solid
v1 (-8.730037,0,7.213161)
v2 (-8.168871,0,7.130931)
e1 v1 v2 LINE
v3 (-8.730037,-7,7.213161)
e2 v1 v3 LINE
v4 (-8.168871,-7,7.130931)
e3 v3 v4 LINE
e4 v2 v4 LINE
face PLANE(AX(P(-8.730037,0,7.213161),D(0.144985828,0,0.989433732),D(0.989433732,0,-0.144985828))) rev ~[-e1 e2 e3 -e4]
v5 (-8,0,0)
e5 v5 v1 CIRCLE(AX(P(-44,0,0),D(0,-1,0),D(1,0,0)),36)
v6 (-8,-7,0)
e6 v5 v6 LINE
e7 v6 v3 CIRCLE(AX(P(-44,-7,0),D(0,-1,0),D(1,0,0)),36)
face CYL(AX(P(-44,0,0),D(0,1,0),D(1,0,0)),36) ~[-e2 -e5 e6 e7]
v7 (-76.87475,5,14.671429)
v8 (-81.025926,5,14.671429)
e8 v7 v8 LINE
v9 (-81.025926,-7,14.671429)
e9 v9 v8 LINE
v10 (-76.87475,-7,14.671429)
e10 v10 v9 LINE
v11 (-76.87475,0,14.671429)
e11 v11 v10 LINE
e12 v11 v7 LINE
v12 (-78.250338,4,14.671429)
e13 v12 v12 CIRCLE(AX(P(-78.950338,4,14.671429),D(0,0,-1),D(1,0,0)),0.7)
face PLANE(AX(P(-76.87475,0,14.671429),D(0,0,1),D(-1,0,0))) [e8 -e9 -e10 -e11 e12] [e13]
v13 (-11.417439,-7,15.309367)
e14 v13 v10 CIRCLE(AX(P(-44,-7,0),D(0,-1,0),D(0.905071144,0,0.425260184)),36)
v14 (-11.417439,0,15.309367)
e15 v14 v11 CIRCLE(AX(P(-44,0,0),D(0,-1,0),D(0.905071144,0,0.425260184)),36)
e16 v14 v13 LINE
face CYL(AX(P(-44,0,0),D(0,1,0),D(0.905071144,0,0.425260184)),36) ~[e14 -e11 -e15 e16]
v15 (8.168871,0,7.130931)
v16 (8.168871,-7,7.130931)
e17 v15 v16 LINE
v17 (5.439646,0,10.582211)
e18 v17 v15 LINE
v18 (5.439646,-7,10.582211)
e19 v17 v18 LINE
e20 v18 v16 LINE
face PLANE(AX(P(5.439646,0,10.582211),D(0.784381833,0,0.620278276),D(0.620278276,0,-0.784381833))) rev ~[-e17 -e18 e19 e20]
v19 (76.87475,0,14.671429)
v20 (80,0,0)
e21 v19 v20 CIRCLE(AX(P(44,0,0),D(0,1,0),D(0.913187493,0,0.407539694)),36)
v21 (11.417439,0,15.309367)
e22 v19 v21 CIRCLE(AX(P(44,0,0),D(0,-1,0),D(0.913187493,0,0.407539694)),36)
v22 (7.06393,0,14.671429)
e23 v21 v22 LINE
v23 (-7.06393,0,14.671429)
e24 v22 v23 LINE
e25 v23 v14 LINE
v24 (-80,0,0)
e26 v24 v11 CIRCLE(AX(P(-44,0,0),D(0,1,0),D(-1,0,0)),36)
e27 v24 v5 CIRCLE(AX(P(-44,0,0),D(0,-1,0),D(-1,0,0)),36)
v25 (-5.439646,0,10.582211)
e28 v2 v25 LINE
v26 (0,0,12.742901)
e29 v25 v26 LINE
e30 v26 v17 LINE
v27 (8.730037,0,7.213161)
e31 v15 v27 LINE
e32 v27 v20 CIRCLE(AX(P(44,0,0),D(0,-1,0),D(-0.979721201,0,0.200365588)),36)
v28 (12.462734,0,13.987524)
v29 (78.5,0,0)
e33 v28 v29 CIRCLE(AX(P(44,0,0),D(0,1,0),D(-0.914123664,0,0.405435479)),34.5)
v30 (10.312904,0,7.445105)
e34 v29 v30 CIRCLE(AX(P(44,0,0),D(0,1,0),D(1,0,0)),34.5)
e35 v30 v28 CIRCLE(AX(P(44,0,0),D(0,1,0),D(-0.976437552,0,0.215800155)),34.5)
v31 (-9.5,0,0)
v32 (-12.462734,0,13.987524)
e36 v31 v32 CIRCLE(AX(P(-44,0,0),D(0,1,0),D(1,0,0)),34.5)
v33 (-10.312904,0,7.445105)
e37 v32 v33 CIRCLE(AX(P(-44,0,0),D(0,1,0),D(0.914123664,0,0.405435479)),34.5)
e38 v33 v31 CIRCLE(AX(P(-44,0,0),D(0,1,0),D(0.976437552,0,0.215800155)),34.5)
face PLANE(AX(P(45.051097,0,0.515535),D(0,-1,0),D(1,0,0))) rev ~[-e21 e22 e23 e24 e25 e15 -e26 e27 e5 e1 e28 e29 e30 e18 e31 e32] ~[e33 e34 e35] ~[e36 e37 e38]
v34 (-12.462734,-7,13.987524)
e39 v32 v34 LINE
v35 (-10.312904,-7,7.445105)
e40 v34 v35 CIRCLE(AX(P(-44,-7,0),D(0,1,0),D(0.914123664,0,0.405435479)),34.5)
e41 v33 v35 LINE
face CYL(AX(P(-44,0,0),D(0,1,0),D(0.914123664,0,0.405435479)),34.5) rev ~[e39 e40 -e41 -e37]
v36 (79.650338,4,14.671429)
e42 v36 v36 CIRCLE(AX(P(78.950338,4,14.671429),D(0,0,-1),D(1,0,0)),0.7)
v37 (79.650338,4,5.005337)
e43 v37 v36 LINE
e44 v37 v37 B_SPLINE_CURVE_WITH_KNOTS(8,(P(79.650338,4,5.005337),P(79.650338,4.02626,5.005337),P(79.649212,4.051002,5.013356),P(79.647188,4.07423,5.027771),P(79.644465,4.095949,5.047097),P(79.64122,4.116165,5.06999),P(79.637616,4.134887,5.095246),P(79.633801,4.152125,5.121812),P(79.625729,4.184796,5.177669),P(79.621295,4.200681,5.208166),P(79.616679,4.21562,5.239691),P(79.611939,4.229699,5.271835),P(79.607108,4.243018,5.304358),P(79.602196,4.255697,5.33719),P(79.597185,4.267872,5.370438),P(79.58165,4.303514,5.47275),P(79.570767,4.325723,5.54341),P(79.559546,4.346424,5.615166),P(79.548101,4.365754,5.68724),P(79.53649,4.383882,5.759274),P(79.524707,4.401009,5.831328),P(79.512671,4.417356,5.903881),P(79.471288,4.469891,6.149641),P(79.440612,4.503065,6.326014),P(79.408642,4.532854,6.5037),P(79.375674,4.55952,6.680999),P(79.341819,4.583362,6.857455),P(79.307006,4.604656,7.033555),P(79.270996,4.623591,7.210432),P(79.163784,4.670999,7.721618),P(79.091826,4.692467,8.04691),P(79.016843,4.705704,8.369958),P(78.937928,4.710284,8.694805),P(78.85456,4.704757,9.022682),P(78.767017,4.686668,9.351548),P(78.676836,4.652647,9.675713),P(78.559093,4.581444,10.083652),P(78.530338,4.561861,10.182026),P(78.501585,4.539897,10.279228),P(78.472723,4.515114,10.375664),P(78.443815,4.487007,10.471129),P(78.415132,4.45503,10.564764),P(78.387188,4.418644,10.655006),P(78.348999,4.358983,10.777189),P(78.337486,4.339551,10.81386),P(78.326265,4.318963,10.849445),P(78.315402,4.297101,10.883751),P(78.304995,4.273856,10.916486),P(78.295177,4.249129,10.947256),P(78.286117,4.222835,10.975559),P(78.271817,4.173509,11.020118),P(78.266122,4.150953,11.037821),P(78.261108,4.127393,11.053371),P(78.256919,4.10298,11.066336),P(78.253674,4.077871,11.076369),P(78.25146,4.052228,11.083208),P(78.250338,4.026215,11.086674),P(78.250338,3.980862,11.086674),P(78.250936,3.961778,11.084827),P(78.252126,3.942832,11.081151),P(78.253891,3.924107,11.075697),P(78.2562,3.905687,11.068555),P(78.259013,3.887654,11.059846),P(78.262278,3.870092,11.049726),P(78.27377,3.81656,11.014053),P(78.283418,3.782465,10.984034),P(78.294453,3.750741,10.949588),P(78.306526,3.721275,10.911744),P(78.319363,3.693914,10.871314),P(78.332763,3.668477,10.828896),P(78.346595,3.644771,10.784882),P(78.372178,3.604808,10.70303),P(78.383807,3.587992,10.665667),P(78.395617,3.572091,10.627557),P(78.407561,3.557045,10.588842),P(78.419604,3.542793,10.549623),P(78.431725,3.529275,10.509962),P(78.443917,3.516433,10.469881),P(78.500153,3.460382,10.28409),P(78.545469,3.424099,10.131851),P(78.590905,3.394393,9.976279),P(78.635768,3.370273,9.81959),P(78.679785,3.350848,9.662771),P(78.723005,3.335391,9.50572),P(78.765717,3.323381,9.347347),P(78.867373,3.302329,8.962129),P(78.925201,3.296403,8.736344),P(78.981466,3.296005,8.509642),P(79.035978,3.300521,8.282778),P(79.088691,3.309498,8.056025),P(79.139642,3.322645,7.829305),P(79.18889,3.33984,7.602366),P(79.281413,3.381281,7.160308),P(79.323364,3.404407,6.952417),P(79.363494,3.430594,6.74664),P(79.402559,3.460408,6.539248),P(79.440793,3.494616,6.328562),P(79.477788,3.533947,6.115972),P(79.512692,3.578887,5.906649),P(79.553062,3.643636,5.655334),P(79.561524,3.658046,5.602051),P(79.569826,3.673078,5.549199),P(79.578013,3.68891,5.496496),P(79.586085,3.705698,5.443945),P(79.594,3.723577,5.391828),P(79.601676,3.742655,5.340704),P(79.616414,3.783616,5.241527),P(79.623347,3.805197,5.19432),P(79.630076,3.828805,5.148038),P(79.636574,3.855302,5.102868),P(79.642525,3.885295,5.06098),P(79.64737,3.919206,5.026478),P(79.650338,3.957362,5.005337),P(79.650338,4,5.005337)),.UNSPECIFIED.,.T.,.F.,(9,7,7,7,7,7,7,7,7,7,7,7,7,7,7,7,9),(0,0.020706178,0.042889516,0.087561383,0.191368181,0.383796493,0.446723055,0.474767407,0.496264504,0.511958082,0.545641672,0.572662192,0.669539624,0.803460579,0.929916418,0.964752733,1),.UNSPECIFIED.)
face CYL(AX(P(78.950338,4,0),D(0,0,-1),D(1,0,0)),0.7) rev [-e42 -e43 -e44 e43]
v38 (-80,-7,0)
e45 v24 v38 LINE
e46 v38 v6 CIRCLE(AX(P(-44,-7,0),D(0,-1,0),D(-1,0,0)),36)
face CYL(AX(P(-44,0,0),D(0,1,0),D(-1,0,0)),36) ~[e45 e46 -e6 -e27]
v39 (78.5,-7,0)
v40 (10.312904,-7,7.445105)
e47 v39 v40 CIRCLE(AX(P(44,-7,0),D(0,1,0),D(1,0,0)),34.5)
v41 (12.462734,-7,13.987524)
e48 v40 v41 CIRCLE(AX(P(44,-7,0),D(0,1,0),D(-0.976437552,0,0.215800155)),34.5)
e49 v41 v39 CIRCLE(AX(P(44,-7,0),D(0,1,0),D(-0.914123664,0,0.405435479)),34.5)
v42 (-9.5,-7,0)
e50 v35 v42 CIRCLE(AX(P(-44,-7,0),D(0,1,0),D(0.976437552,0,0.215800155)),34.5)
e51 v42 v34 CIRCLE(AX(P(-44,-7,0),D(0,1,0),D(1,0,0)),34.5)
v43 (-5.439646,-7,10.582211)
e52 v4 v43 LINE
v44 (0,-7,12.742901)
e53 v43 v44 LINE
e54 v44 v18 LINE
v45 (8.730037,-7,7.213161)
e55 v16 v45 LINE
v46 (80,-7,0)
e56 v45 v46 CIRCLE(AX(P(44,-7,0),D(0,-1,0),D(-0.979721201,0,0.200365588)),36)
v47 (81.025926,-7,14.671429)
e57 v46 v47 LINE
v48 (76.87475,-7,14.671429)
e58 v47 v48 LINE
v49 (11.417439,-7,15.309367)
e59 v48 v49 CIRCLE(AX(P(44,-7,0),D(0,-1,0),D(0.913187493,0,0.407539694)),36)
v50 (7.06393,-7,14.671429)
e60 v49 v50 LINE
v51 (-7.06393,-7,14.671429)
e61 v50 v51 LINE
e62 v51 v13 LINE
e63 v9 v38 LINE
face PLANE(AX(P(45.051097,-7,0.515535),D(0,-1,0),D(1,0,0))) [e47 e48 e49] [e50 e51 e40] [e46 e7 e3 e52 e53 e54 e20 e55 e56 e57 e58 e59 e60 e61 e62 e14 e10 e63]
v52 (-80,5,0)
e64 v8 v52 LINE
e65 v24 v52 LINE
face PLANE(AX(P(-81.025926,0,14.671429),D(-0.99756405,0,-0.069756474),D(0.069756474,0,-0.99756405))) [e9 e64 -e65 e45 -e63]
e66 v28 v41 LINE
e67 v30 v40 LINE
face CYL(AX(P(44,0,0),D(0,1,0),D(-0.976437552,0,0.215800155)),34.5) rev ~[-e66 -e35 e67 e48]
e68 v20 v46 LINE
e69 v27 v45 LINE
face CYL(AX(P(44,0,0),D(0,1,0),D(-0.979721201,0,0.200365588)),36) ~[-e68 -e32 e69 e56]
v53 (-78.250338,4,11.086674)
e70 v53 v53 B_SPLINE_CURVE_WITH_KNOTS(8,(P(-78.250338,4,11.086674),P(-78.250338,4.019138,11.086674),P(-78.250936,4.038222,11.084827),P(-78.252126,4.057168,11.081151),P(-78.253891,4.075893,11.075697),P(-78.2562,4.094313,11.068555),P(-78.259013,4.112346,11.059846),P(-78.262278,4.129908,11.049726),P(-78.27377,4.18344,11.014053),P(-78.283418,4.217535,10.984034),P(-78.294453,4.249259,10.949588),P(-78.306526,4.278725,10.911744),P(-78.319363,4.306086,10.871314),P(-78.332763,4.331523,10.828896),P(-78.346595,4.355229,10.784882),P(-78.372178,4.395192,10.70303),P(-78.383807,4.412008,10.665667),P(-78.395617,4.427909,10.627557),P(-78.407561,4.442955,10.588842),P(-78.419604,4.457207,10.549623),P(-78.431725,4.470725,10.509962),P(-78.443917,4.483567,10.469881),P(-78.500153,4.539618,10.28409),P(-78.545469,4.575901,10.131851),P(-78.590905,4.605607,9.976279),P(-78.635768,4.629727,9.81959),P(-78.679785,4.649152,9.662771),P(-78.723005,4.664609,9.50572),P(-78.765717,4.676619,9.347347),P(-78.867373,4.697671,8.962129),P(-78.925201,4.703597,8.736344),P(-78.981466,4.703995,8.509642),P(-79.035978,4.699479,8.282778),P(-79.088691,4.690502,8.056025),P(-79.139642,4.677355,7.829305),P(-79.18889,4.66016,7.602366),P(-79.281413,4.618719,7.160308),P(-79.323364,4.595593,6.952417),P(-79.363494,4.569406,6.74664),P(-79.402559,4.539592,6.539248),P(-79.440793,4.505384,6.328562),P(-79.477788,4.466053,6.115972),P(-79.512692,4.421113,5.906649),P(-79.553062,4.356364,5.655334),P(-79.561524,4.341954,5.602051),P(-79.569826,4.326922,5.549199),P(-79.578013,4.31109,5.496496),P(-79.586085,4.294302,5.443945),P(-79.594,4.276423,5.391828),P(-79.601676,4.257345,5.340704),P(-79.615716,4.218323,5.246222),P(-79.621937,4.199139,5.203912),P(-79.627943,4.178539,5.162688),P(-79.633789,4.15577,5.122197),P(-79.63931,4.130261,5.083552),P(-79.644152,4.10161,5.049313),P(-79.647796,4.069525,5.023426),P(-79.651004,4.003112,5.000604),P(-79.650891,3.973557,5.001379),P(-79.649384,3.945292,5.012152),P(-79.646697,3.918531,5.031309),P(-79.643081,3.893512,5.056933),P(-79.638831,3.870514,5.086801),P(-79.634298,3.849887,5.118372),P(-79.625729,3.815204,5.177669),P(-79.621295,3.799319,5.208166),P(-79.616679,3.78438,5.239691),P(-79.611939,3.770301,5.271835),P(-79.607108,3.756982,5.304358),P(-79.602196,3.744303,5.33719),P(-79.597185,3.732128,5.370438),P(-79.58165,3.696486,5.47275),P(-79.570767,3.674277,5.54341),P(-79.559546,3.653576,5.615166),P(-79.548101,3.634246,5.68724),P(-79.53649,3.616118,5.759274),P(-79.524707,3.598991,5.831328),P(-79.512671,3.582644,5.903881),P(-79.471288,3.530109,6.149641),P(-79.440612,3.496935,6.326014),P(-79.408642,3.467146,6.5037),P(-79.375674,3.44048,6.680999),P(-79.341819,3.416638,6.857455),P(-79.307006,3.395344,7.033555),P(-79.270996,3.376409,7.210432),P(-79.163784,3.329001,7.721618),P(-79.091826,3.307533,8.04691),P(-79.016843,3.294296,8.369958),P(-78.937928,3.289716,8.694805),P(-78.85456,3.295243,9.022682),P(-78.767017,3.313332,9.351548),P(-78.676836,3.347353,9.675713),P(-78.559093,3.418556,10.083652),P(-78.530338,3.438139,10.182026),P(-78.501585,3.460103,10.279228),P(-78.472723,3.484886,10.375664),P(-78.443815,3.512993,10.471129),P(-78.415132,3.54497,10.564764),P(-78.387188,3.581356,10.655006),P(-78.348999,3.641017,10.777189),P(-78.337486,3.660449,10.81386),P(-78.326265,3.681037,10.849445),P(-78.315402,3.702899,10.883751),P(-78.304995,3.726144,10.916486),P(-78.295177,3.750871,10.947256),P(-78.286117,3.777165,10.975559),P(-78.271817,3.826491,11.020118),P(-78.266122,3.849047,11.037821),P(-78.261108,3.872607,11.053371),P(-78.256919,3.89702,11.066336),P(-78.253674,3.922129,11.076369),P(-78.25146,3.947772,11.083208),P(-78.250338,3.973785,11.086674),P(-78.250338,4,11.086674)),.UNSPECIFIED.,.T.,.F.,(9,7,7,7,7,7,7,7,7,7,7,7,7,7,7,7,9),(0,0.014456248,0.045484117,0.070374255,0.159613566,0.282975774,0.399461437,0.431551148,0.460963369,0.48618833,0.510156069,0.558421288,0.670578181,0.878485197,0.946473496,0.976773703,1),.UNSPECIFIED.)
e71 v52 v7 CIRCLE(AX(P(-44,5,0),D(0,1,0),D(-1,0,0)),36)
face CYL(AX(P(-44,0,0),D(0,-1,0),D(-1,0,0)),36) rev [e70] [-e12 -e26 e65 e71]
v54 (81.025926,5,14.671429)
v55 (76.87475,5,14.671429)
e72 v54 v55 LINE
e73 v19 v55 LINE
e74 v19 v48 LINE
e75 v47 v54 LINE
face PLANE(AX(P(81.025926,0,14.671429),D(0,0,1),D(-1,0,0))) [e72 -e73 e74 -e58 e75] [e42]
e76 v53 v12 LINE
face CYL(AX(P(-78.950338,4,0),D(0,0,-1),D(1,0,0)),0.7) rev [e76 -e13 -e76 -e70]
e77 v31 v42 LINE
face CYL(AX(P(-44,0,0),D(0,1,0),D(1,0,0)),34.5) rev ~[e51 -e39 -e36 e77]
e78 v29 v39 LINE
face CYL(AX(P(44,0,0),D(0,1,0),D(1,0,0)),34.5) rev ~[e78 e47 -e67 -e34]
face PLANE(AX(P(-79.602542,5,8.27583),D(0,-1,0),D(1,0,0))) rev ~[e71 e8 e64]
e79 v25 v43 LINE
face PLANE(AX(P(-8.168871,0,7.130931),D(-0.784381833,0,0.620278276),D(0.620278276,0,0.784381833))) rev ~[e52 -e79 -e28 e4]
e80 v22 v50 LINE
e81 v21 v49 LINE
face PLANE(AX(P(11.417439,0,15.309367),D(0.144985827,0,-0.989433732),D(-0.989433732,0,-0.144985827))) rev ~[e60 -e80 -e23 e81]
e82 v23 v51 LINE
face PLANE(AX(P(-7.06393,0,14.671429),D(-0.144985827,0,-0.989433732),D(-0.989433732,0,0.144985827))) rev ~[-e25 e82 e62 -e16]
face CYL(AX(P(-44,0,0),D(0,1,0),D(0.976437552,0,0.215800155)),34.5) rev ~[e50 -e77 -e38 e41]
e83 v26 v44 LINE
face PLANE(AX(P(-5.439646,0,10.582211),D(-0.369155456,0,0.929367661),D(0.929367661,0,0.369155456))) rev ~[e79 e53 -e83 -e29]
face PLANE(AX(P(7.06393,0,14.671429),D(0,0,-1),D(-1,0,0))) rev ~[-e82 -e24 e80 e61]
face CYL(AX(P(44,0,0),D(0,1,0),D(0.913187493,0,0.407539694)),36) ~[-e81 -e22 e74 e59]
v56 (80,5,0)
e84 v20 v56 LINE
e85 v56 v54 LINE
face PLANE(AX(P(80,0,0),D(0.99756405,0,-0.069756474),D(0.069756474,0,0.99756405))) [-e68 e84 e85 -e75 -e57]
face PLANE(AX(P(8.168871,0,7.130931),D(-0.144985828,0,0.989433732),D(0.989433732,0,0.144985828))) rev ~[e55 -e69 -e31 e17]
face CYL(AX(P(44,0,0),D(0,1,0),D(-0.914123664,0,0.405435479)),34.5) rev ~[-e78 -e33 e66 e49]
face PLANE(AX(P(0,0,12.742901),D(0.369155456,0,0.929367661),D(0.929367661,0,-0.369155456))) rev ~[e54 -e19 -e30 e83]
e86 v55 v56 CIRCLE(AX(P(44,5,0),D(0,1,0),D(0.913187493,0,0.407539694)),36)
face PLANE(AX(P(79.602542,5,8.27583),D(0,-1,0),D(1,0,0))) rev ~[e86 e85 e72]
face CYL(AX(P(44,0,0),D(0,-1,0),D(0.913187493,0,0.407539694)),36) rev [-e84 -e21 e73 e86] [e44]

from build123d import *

# Parameters (mm, degrees)
F1_DEPTH = 7
F2_DEPTH = 5
F3_R     = 0.7
F4_DEPTH = 36.001


# Not quite as in the source:
# - a feature names something its author has since deleted; it is built from what else it names


with BuildPart() as f1:
    # F0 (on Front) → F1 (new body)
    with BuildSketch(Plane.XZ):
        with BuildLine():
            ThreePointArc((76.8747497611, 14.6714289741), (44.3508342177, 35.9982904504), (11.4174388077, 15.3093666149))
            Line((11.4174388077, 15.3093666149), (12.4627336019, 13.9875240173))
            ThreePointArc((12.4627336019, 13.9875240173), (51.1489268169, 33.7511902807), (78.5, 0))
            ThreePointArc((78.5, 0), (40.255323539, -34.2961717718), (10.312904452, 7.4451053411))
            Line((10.312904452, 7.4451053411), (8.7300367759, 7.2131611772))
            ThreePointArc((8.7300367759, 7.2131611772), (40.3749949013, -35.8170258122), (80, 0))
            ThreePointArc((80, 0), (79.2100198197, 7.5003002806), (76.8747497611, 14.6714289741))
        make_face()
        with BuildLine():
            ThreePointArc((-10.312904452, 7.4451053411), (-9.7038282282, 3.744676461), (-9.5, 0))
            ThreePointArc((-9.5, 0), (-77.7511902807, -7.1489268169), (-12.4627336019, 13.9875240173))
            Line((-12.4627336019, 13.9875240173), (-11.4174388077, 15.3093666149))
            ThreePointArc((-11.4174388077, 15.3093666149), (-44.3508342177, 35.9982904504), (-76.8747497611, 14.6714289741))
            ThreePointArc((-76.8747497611, 14.6714289741), (-79.2100198197, 7.5003002806), (-80, 0))
            ThreePointArc((-80, 0), (-44, -36), (-8, 0))
            ThreePointArc((-8, 0), (-8.1829741878, 3.6250050987), (-8.7300367759, 7.2131611772))
            Line((-8.7300367759, 7.2131611772), (-10.312904452, 7.4451053411))
        make_face()
        with BuildLine():
            ThreePointArc((-12.4627336019, 13.9875240173), (-11.2241680754, 10.7700901411), (-10.312904452, 7.4451053411))
            Line((-10.312904452, 7.4451053411), (-8.7300367759, 7.2131611772))
            ThreePointArc((-8.7300367759, 7.2131611772), (-9.8330802816, 11.3411461924), (-11.4174388077, 15.3093666149))
            Line((-11.4174388077, 15.3093666149), (-12.4627336019, 13.9875240173))
        make_face()
        with BuildLine():
            ThreePointArc((-11.4174388077, 15.3093666149), (-9.8330802816, 11.3411461924), (-8.7300367759, 7.2131611772))
            Line((-8.7300367759, 7.2131611772), (-8.1688707932, 7.1309311988))
            Line((-8.1688707932, 7.1309311988), (-5.43964638, 10.5822112661))
            Line((-5.43964638, 10.5822112661), (-7.0639303873, 14.6714289741))
            Line((-7.0639303873, 14.6714289741), (-11.4174388077, 15.3093666149))
        make_face()
        Polygon((0, 14.6714289741), (-7.0639303873, 14.6714289741), (-5.43964638, 10.5822112661), (0, 12.7429009753), (5.43964638, 10.5822112661), (7.0639303873, 14.6714289741), align=None)
        with BuildLine():
            Line((11.4174388077, 15.3093666149), (7.0639303873, 14.6714289741))
            Line((7.0639303873, 14.6714289741), (5.43964638, 10.5822112661))
            Line((5.43964638, 10.5822112661), (8.1688707932, 7.1309311988))
            Line((8.1688707932, 7.1309311988), (8.7300367759, 7.2131611772))
            ThreePointArc((8.7300367759, 7.2131611772), (9.8330802816, 11.3411461924), (11.4174388077, 15.3093666149))
        make_face()
        with BuildLine():
            Line((12.4627336019, 13.9875240173), (11.4174388077, 15.3093666149))
            ThreePointArc((11.4174388077, 15.3093666149), (9.8330802816, 11.3411461924), (8.7300367759, 7.2131611772))
            Line((8.7300367759, 7.2131611772), (10.312904452, 7.4451053411))
            ThreePointArc((10.312904452, 7.4451053411), (11.2241680754, 10.7700901411), (12.4627336019, 13.9875240173))
        make_face()
        with BuildLine():
            Line((81.0259262548, 14.6714289741), (76.8747497611, 14.6714289741))
            ThreePointArc((76.8747497611, 14.6714289741), (79.2100198197, 7.5003002806), (80, 0))
            Line((80, 0), (81.0259262548, 14.6714289741))
        make_face()
        with BuildLine():
            ThreePointArc((-80, 0), (-79.2100198197, 7.5003002806), (-76.8747497611, 14.6714289741))
            Line((-76.8747497611, 14.6714289741), (-81.0259262548, 14.6714289741))
            Line((-81.0259262548, 14.6714289741), (-80, 0))
        make_face()
    extrude(amount=F1_DEPTH)

    # F0 (on Front) → F2 (join)
    with BuildSketch(Plane.XZ):
        with BuildLine():
            ThreePointArc((-80, 0), (-79.2100198197, 7.5003002806), (-76.8747497611, 14.6714289741))
            Line((-76.8747497611, 14.6714289741), (-81.0259262548, 14.6714289741))
            Line((-81.0259262548, 14.6714289741), (-80, 0))
        make_face()
        with BuildLine():
            Line((81.0259262548, 14.6714289741), (76.8747497611, 14.6714289741))
            ThreePointArc((76.8747497611, 14.6714289741), (79.2100198197, 7.5003002806), (80, 0))
            Line((80, 0), (81.0259262548, 14.6714289741))
        make_face()
    extrude(amount=-F2_DEPTH)

    # F3 (on Top) → F4 (cut, through all)
    with BuildSketch(Plane.XY):
        with Locations((-78.950338008, 4)):
            Circle(F3_R)
        with Locations((78.950338008, 4)):
            Circle(F3_R)
    extrude(amount=F4_DEPTH, mode=Mode.SUBTRACT)


solid = f1.part
